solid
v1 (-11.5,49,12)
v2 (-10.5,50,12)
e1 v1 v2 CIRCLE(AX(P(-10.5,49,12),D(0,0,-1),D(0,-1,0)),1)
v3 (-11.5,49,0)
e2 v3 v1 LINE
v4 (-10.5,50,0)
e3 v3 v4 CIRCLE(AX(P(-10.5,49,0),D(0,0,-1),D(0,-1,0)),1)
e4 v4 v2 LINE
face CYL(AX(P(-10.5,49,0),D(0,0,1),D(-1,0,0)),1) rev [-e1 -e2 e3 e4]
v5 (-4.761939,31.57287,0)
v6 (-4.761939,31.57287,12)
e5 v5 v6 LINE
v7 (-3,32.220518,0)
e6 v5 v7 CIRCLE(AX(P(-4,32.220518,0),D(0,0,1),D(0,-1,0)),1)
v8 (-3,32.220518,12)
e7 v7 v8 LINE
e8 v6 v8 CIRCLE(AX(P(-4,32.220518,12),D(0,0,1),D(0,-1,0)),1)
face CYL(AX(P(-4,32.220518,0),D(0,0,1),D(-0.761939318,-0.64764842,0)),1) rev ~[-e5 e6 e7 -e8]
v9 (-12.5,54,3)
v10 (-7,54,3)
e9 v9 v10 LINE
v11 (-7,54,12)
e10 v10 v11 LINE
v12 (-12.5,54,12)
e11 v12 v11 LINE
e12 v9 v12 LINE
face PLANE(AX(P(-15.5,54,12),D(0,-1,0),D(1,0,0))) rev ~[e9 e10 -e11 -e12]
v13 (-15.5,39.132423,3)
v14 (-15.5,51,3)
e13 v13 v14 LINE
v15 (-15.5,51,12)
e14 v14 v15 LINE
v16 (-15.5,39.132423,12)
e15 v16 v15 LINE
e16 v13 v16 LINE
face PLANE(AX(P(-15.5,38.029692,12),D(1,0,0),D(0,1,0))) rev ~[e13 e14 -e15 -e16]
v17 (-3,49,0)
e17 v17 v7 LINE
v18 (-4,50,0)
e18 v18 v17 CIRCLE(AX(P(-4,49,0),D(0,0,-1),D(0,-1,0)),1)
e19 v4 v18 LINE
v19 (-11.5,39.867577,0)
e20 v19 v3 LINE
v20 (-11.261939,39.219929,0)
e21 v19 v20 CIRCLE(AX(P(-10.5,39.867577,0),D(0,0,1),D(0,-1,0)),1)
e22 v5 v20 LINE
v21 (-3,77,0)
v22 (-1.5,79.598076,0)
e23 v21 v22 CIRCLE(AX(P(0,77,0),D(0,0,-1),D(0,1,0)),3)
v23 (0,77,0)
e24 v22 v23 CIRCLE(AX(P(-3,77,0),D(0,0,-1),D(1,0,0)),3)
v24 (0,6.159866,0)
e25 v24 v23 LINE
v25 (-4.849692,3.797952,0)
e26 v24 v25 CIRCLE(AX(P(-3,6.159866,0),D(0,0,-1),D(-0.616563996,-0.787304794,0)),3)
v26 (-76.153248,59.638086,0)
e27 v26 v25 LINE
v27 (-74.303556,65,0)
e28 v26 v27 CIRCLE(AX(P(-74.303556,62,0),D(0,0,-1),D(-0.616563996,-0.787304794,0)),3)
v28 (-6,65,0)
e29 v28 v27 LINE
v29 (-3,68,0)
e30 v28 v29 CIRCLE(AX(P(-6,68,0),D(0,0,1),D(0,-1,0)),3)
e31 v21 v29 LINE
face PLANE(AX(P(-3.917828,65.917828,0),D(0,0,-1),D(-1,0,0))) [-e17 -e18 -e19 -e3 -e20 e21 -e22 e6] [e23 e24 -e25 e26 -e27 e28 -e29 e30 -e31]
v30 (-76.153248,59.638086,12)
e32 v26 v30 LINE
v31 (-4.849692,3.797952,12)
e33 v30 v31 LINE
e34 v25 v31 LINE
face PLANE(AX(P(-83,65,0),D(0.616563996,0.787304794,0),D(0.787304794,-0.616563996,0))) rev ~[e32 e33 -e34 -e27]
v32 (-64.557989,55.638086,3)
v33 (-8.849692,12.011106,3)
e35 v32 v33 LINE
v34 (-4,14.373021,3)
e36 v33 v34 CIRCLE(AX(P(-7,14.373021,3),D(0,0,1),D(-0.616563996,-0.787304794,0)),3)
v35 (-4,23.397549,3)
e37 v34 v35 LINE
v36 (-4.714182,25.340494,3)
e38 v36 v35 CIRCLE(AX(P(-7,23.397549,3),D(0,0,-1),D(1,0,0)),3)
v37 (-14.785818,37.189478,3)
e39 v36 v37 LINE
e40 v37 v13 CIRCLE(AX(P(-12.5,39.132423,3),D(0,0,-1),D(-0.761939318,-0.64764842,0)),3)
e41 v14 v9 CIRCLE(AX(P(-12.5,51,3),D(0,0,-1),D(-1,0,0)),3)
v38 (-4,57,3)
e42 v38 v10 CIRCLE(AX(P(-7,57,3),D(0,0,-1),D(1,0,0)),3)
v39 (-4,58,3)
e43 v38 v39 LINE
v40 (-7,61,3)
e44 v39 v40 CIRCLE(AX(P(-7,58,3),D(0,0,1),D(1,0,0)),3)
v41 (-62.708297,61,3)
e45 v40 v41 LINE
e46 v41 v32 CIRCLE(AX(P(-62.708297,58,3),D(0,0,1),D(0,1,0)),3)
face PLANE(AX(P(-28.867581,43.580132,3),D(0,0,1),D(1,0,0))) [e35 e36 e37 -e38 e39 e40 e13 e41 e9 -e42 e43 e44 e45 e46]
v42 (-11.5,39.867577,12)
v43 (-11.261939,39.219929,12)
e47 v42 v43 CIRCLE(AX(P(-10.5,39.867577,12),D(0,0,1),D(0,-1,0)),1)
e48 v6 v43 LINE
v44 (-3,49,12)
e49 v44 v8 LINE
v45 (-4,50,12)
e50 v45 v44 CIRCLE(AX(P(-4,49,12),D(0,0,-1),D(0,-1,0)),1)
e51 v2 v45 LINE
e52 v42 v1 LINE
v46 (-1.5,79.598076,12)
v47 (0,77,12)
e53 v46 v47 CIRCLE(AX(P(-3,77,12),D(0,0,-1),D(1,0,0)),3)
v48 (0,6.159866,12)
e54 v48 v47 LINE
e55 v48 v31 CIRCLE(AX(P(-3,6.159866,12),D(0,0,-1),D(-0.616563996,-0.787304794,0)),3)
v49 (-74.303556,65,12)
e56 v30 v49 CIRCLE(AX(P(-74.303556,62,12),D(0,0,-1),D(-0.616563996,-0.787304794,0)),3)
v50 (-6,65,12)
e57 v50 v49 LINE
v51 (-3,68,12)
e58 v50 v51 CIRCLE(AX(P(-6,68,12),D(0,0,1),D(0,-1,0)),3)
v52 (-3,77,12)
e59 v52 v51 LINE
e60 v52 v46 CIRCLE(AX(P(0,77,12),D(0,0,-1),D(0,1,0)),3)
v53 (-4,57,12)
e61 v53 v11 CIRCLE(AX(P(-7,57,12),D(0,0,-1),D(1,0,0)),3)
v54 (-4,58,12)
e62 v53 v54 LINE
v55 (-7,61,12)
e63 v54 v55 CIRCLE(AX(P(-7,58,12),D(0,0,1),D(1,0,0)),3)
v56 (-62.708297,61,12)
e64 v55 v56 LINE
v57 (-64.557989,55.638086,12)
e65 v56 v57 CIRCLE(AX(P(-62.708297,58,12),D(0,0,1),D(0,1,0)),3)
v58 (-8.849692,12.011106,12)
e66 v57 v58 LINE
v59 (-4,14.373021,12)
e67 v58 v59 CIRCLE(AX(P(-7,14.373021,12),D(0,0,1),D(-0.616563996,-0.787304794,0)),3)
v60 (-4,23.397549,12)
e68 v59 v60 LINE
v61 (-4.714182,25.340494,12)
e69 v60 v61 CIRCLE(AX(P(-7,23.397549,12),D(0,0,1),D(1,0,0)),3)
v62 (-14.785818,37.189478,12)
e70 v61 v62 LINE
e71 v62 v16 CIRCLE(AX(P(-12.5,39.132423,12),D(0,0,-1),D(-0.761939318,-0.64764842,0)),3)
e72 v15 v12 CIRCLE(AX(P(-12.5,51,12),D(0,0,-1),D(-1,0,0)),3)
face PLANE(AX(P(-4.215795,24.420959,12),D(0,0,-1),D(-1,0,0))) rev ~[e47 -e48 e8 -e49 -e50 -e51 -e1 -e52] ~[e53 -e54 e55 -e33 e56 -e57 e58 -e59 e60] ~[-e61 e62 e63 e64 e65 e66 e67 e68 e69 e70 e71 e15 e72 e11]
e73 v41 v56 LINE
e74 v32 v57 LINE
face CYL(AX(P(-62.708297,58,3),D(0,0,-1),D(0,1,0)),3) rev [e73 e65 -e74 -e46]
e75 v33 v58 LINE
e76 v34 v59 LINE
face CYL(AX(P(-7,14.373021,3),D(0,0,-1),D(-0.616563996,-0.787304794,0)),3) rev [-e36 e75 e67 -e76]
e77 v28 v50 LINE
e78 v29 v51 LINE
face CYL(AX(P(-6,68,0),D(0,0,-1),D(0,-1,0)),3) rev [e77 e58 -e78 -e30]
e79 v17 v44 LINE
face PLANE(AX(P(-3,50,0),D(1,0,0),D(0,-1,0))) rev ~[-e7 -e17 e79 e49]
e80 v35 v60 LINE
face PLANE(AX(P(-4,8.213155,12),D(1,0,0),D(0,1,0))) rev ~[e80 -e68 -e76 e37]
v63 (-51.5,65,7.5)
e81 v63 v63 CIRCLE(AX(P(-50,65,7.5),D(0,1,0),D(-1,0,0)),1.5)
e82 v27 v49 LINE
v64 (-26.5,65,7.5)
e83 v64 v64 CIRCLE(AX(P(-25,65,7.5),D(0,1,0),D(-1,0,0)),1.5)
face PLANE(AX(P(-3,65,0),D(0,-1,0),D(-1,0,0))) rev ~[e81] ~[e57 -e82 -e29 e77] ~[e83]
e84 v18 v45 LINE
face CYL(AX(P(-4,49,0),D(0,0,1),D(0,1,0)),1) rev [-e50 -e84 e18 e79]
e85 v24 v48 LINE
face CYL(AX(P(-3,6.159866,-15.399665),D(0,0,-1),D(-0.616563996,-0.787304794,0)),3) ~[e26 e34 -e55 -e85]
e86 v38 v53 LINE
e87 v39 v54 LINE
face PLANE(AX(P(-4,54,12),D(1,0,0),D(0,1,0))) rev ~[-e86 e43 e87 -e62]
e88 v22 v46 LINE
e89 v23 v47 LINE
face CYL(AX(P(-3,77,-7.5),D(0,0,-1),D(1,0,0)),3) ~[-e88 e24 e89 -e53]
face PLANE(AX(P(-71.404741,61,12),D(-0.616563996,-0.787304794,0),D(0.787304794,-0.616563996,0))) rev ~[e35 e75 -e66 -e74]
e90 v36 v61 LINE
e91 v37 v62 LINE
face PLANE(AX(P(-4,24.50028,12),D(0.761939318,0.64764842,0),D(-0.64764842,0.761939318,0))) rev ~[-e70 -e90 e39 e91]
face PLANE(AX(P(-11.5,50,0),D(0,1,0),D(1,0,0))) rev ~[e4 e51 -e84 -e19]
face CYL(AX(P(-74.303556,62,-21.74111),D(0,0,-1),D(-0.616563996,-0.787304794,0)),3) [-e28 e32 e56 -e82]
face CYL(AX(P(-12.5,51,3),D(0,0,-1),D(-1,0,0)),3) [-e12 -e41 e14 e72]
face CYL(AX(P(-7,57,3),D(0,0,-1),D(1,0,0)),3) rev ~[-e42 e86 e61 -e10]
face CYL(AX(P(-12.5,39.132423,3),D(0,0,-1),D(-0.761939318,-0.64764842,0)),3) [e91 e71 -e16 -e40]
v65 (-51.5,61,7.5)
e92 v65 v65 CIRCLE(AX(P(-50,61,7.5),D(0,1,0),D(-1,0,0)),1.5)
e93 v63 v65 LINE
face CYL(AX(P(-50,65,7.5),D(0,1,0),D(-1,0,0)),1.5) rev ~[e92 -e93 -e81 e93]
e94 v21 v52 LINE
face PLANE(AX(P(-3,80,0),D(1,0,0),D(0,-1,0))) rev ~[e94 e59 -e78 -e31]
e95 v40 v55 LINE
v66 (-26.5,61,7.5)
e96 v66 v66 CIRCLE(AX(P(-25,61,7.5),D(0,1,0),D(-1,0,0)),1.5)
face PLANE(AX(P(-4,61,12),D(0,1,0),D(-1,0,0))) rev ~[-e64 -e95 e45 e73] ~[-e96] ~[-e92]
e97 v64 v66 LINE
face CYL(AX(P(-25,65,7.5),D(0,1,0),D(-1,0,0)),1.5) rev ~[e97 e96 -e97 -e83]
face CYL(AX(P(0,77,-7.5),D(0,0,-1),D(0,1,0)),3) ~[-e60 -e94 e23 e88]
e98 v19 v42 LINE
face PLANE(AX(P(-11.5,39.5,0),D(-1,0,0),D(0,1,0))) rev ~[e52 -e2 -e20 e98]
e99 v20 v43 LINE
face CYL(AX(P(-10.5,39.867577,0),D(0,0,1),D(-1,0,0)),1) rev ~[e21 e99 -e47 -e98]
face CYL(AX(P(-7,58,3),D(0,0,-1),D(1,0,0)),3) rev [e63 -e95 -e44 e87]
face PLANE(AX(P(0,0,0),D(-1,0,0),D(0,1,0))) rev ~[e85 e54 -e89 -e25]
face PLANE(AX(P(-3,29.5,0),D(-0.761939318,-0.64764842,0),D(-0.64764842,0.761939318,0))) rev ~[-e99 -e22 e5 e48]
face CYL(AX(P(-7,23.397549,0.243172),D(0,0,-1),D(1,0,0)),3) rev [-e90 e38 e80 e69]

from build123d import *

# Parameters (mm, degrees)
F1_DEPTH     = 12
F3_DEPTH     = 9
F4_R         = 1.5
F5_DEPTH     = 4
F6_T1_DEPTH  = 12
F6_T3_DEPTH  = 9
F6_T5_DEPTH  = 11.7568277192
F6_T7_DEPTH  = 16.5
F6_T9_DEPTH  = 11.7568277192
F6_T11_DEPTH = 55.4822209965
F6_T13_DEPTH = 27
F6_T15_DEPTH = 42.7993296961
F7_R         = 1


# Not quite as in the source:
# - a fillet or chamfer that OpenCascade refuses, or shapes differently, is made with other operations: its cross-section is extruded or revolved along the edge and cut away or added


with BuildPart() as f1:
    # F0 (on Top) → F1 (new body)
    with BuildSketch(Plane.XY):
        Polygon((-83, 65), (0, 0), (0, 80), (-3, 80), (-3, 65), align=None)
        Polygon((-11.5, 50), (-3, 50), (-3, 29.5), (-11.5, 39.5), align=None, mode=Mode.SUBTRACT)
    extrude(amount=F1_DEPTH)

    # F2 (on face) → F3 (cut)
    with BuildSketch(Plane.XY.offset(12)):
        Polygon((-4, 54), (-4, 61), (-71.4047410676, 61), (-4, 8.2131545856), (-4, 24.5002801184), (-15.5, 38.0296918831), (-15.5, 54), align=None)
    extrude(amount=-F3_DEPTH, mode=Mode.SUBTRACT)

    # F4 (on face) → F5 (cut)
    with BuildSketch(Plane(origin=(0, 65, 0), x_dir=(-1, 0, 0), z_dir=(0, 1, 0))):
        with Locations((50, 7.5)):
            Circle(F4_R)
        with Locations((25, 7.5)):
            Circle(F4_R)
    extrude(amount=-F5_DEPTH, mode=Mode.SUBTRACT)

    # F6: fillet of radius 3 on 12 edges, made by hand

    # F6_s2 → F6_t1 (join)
    with BuildSketch(Plane.XY):
        with BuildLine():
            ThreePointArc((-6, 65), (-3.8786796564, 65.8786796564), (-3, 68))
            Line((-3, 68), (-3, 65))
            Line((-3, 65), (-6, 65))
        make_face()
    extrude(amount=F6_T1_DEPTH)

    # F6_s4 → F6_t3 (join)
    with BuildSketch(Plane.XY.offset(3)):
        with BuildLine():
            ThreePointArc((-4, 57), (-4.8786796564, 54.8786796564), (-7, 54))
            Line((-7, 54), (-4, 54))
            Line((-4, 54), (-4, 57))
        make_face()
        with BuildLine():
            ThreePointArc((-4, 58), (-4.8786796564, 60.1213203436), (-7, 61))
            Line((-7, 61), (-4, 61))
            Line((-4, 61), (-4, 58))
        make_face()
        with BuildLine():
            ThreePointArc((-8.8496919869, 12.0111061416), (-5.6864315702, 11.6758853817), (-4, 14.3730205248))
            Line((-4, 14.3730205248), (-4, 8.2131545856))
            Line((-4, 8.2131545856), (-8.8496919869, 12.0111061416))
        make_face()
        with BuildLine():
            ThreePointArc((-62.7082968683, 61), (-65.544292562, 58.9783294052), (-64.5579888552, 55.6380856168))
            Line((-64.5579888552, 55.6380856168), (-71.4047410676, 61))
            Line((-71.4047410676, 61), (-62.7082968683, 61))
        make_face()
    extrude(amount=F6_T3_DEPTH)

    # F6_s6 → F6_t5 (join)
    with BuildSketch(Plane.XY.offset(0.2431722808)):
        with BuildLine():
            ThreePointArc((-4, 23.3975490307), (-4.1842004812, 24.4325722527), (-4.7141820467, 25.340494291))
            Line((-4.7141820467, 25.340494291), (-4, 24.5002801184))
            Line((-4, 24.5002801184), (-4, 23.3975490307))
        make_face()
    extrude(amount=F6_T5_DEPTH)

    # F6_s8 → F6_t7 (cut)
    with BuildSketch(Plane.XY.offset(3)):
        with BuildLine():
            ThreePointArc((-15.5, 51), (-14.6213203436, 53.1213203436), (-12.5, 54))
            Line((-12.5, 54), (-15.5, 54))
            Line((-15.5, 54), (-15.5, 51))
        make_face()
    extrude(amount=F6_T7_DEPTH, mode=Mode.SUBTRACT)

    # F6_s10 → F6_t9 (cut)
    with BuildSketch(Plane.XY.offset(3)):
        with BuildLine():
            ThreePointArc((-14.7858179533, 37.1894777105), (-15.3157995188, 38.0973997488), (-15.5, 39.1324229708))
            Line((-15.5, 39.1324229708), (-15.5, 38.0296918831))
            Line((-15.5, 38.0296918831), (-14.7858179533, 37.1894777105))
        make_face()
    extrude(amount=F6_T9_DEPTH, mode=Mode.SUBTRACT)

    # F6_s12 → F6_t11 (cut)
    with BuildSketch(Plane.XY.offset(-21.7411104983)):
        with BuildLine():
            ThreePointArc((-76.1532477876, 59.6380856168), (-77.1395514944, 62.9783294052), (-74.3035558007, 65))
            Line((-74.3035558007, 65), (-83, 65))
            Line((-83, 65), (-76.1532477876, 59.6380856168))
        make_face()
    extrude(amount=F6_T11_DEPTH, mode=Mode.SUBTRACT)

    # F6_s14 → F6_t13 (cut)
    with BuildSketch(Plane.XY.offset(-7.5)):
        with BuildLine():
            ThreePointArc((0, 80), (-2.1213203436, 79.1213203436), (-3, 77))
            Line((-3, 77), (-3, 80))
            Line((-3, 80), (0, 80))
        make_face()
        with BuildLine():
            ThreePointArc((0, 77), (-0.8786796564, 79.1213203436), (-3, 80))
            Line((-3, 80), (0, 80))
            Line((0, 80), (0, 77))
        make_face()
    extrude(amount=F6_T13_DEPTH, mode=Mode.SUBTRACT)

    # F6_s16 → F6_t15 (cut)
    with BuildSketch(Plane.XY.offset(-15.399664848)):
        with BuildLine():
            ThreePointArc((-4.8496919869, 3.797951556), (-1.6864315702, 3.4627307961), (0, 6.1598659392))
            Line((0, 6.1598659392), (0, 0))
            Line((0, 0), (-4.8496919869, 3.797951556))
        make_face()
    extrude(amount=F6_T15_DEPTH, mode=Mode.SUBTRACT)

    # F7
    f7_edges = [f1.edges().sort_by_distance(p)[0] for p in [
        (-11.5, 50, 6),
        (-3, 50, 6),
        (-11.5, 39.5, 6),
        (-3, 29.5, 6),
    ]]
    fillet(f7_edges, radius=F7_R)


solid = f1.part
